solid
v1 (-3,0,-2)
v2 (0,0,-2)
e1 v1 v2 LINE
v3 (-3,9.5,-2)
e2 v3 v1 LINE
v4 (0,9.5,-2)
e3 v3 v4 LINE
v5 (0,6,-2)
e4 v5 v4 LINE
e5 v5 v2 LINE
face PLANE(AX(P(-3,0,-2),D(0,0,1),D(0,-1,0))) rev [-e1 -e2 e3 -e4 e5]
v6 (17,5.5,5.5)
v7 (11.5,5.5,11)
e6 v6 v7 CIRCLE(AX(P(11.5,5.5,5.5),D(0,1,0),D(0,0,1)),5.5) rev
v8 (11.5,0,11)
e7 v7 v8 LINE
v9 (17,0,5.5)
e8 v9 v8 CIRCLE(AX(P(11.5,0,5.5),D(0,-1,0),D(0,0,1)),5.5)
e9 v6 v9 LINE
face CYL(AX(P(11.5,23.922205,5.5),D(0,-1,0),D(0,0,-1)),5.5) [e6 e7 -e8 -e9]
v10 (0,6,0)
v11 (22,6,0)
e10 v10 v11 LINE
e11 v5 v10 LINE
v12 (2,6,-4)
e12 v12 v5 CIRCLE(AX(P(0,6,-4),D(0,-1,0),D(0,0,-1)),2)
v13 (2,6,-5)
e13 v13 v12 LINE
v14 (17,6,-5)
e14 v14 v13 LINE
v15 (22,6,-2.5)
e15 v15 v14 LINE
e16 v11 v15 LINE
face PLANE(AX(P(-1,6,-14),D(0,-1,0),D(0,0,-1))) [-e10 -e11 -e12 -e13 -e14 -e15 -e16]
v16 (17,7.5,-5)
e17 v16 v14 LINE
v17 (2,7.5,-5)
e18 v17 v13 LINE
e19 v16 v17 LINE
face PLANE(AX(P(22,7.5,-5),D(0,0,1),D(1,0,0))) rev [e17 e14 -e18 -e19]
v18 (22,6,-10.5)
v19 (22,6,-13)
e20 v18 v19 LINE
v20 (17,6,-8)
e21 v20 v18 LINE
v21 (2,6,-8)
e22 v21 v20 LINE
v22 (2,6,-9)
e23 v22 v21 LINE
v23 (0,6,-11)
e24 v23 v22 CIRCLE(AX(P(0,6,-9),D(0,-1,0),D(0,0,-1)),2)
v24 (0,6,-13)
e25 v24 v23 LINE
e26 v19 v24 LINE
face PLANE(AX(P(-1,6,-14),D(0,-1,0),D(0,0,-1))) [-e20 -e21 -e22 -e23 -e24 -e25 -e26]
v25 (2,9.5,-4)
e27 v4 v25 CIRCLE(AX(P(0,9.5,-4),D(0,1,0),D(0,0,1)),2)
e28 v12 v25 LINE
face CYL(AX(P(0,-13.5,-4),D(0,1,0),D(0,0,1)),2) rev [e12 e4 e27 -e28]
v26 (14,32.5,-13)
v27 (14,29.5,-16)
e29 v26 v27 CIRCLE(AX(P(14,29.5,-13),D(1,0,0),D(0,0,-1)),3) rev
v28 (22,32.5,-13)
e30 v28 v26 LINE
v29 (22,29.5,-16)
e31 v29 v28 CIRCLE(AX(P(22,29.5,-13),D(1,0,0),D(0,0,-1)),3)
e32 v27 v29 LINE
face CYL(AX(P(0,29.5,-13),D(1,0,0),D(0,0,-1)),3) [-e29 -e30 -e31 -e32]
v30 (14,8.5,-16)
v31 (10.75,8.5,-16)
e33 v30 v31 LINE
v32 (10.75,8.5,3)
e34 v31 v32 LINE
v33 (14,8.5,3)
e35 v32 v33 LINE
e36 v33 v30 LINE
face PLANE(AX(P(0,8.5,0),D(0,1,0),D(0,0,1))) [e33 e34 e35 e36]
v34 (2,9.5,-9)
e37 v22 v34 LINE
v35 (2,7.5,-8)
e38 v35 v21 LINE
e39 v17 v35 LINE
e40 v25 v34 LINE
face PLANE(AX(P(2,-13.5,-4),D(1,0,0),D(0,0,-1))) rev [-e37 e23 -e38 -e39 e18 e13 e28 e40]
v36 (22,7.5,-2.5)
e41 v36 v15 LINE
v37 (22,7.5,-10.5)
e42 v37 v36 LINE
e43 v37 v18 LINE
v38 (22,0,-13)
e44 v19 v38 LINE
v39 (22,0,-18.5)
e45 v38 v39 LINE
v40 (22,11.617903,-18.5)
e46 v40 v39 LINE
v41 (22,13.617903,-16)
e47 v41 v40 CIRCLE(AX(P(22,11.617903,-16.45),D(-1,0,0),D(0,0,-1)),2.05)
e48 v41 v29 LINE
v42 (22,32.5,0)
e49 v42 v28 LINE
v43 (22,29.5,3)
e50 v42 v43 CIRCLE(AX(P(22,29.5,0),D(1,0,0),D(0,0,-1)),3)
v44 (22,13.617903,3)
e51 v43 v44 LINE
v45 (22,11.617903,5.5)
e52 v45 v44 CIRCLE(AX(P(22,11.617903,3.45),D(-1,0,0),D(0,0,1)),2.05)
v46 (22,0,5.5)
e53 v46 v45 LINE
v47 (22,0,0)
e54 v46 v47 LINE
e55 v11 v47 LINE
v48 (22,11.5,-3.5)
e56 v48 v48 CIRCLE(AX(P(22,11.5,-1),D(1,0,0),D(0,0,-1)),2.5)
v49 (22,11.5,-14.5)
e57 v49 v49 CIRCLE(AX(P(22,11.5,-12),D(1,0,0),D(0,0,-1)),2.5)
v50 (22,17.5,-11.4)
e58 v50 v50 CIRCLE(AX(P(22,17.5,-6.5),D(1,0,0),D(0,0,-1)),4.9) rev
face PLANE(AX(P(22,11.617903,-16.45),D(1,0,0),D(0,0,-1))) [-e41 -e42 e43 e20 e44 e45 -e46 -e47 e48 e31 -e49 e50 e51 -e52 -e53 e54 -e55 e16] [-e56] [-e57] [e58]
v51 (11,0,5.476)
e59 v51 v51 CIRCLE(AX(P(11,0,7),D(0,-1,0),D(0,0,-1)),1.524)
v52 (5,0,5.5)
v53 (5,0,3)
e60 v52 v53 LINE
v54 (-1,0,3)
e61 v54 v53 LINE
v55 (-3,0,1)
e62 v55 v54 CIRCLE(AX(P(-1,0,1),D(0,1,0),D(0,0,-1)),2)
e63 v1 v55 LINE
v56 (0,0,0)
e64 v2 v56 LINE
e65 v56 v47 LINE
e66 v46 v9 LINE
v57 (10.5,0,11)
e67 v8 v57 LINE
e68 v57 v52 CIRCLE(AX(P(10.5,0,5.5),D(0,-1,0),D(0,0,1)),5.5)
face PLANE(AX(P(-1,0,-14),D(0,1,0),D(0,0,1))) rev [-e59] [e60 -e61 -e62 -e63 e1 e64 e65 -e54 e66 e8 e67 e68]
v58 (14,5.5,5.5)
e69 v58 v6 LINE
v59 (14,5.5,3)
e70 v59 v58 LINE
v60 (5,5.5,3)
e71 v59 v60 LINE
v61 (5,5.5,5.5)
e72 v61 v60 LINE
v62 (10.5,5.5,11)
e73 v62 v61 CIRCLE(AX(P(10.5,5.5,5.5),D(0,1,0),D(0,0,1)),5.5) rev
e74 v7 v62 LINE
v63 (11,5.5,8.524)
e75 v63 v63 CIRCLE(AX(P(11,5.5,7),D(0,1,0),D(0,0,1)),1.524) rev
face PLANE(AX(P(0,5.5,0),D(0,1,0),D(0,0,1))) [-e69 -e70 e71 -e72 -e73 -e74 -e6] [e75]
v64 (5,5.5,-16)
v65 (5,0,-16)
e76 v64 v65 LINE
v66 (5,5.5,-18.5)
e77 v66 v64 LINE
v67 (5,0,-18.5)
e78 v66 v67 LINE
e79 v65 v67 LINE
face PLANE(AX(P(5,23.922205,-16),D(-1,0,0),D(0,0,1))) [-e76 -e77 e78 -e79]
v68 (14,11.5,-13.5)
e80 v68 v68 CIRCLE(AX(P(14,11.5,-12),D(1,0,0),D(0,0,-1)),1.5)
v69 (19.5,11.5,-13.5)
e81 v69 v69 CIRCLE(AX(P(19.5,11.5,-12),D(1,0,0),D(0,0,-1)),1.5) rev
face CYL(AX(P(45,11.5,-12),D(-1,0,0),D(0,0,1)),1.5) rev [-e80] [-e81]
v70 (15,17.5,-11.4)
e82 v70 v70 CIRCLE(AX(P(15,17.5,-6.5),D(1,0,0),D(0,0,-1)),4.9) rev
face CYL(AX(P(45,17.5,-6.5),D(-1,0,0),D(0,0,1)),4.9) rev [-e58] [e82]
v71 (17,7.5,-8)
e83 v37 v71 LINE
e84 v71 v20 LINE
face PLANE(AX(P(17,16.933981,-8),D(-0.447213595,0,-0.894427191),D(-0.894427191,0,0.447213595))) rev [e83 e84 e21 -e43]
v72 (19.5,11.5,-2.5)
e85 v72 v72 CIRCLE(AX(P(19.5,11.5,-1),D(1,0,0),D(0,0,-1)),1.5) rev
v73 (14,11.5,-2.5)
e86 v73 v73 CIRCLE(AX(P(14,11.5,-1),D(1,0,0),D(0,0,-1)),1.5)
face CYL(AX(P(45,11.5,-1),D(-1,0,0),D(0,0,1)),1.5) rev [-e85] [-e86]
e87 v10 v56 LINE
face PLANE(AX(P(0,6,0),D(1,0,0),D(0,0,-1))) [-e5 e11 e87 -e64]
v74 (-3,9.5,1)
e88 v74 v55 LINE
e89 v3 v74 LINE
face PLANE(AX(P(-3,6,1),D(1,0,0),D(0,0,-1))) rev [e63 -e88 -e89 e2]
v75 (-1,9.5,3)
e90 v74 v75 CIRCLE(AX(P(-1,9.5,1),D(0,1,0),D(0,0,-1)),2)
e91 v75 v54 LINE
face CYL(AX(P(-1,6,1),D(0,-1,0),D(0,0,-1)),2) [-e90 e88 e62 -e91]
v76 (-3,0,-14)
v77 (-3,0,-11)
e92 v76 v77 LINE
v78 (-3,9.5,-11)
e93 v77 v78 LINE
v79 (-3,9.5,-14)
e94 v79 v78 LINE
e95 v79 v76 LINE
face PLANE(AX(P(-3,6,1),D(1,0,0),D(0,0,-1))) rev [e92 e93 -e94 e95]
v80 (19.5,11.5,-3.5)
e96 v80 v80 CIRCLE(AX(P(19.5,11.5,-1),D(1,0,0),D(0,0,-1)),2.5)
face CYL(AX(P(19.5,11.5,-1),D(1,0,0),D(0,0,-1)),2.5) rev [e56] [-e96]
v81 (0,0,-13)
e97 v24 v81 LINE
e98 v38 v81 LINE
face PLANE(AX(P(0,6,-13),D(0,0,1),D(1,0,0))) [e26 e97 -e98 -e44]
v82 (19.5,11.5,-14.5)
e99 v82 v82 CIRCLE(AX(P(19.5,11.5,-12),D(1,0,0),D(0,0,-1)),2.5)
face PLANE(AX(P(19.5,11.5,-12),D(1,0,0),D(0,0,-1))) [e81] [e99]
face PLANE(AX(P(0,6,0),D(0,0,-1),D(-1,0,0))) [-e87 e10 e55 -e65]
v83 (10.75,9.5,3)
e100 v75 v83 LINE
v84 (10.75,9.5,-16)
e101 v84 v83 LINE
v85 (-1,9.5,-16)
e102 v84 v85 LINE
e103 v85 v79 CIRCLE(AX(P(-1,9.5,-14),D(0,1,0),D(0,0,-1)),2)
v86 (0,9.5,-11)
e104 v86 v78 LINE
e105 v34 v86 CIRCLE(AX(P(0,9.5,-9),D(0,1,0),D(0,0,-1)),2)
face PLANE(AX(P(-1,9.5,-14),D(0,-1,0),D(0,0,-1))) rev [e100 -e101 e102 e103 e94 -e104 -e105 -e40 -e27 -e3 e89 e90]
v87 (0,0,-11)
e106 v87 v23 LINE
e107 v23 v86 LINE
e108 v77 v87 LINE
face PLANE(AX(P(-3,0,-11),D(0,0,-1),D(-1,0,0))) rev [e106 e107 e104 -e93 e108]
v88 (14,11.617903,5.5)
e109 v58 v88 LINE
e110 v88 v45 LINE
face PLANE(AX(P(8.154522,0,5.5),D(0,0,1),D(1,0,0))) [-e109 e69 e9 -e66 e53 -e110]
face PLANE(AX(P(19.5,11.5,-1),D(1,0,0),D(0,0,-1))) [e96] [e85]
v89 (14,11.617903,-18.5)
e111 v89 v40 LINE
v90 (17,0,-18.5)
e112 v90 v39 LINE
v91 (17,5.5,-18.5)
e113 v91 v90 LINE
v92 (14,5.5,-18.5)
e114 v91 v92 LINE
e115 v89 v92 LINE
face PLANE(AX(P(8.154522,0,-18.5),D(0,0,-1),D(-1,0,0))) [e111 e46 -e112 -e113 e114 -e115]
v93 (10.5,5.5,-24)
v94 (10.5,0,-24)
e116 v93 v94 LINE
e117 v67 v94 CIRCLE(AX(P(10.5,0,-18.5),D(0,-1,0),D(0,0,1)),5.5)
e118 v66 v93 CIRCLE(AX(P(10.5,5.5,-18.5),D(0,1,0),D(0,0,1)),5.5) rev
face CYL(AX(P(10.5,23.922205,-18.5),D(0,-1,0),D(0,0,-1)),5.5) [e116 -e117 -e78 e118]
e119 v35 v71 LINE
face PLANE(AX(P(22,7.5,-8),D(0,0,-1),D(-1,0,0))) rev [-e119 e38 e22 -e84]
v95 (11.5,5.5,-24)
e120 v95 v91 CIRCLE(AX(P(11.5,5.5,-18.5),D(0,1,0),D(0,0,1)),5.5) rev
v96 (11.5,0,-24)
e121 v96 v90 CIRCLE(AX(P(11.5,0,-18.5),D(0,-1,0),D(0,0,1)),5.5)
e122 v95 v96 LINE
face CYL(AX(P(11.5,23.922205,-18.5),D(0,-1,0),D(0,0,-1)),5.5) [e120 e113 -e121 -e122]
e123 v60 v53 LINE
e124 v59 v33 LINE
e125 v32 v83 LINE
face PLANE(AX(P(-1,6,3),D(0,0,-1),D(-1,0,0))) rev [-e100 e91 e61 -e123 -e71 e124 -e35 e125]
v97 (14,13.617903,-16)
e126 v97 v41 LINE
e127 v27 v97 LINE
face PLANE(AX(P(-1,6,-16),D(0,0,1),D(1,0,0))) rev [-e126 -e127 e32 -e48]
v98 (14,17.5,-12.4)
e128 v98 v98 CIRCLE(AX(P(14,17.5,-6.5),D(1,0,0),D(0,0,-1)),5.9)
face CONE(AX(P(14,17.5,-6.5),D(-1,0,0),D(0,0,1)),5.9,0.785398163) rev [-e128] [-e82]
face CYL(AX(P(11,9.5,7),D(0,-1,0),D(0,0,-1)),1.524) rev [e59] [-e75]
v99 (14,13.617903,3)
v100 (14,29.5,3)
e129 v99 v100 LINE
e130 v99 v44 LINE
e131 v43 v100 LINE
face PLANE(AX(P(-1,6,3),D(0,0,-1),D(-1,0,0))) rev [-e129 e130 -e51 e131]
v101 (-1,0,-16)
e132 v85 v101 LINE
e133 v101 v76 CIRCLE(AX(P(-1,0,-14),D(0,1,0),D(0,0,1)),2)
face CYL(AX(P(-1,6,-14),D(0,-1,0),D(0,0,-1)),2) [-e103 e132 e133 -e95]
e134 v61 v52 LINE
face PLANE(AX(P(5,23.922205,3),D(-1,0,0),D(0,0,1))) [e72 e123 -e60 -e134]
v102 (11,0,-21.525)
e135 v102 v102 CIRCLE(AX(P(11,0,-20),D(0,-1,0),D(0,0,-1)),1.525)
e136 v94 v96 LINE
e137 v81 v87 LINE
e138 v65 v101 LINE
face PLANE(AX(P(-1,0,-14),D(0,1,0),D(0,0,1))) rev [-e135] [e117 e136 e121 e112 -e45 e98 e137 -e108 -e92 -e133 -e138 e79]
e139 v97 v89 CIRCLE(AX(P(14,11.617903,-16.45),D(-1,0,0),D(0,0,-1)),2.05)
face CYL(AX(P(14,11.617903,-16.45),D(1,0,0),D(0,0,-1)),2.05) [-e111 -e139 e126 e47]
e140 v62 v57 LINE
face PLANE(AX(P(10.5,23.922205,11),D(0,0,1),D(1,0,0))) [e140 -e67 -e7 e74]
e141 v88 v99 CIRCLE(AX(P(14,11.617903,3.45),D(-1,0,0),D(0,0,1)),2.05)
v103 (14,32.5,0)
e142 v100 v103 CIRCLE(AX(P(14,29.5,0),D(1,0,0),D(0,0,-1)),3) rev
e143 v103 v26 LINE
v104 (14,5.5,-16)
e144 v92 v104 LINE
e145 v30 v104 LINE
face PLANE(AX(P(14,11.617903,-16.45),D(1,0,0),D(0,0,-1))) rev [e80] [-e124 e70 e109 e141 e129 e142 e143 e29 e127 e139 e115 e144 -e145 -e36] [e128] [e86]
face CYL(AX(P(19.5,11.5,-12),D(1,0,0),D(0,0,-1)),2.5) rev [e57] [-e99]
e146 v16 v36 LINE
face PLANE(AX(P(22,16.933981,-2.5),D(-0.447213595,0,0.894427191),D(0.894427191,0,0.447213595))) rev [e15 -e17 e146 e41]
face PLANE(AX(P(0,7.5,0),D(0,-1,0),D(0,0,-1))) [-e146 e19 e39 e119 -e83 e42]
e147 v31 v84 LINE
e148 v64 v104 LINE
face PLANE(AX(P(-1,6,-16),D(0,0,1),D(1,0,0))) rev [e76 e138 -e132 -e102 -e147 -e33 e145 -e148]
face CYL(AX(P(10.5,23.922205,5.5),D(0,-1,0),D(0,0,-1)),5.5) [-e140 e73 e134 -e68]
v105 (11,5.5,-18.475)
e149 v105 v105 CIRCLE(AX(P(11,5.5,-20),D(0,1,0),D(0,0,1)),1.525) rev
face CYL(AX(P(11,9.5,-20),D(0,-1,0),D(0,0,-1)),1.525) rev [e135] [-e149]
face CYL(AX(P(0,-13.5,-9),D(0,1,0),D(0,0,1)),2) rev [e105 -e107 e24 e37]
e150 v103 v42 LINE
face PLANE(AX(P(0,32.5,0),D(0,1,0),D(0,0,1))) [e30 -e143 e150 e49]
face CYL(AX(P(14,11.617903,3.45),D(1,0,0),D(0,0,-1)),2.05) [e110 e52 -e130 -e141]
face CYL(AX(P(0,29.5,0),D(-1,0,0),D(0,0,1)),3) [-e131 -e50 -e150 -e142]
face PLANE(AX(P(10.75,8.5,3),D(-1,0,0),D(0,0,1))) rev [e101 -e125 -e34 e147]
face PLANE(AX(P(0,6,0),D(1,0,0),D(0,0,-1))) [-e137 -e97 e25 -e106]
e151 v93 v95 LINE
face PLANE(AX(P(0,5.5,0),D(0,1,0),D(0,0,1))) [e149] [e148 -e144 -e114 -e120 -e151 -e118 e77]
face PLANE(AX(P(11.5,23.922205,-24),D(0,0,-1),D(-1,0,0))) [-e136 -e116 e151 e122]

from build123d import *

# Parameters (mm, degrees)
SKETCH1_W           = 22
SKETCH1_H           = 13
BOSS_EXTRUDE1_DEPTH = 6
BOSS_EXTRUDE2_DEPTH = 3.5
BOSS_EXTRUDE3_DEPTH = 9.5
SKETCH4_R           = 1.525
SKETCH4_R_2         = 1.524
CUT_EXTRUDE1_DEPTH  = 36.933967218
SKETCH5_W           = 9
SKETCH5_H           = 5.5
CUT_EXTRUDE2_DEPTH  = 39.082148049
FILLET1_R           = 2
SKETCH6_W           = 12
SKETCH6_H           = 13.009000019
SKETCH6_W_2         = 15.838286437
CUT_EXTRUDE3_DEPTH  = 4
BOSS_EXTRUDE4_DEPTH = 23
CUT_EXTRUDE4_DEPTH  = 23
SKETCH9_R           = 4.9
CUT_EXTRUDE6_DEPTH  = 23
SKETCH10_R          = 1.5
CUT_EXTRUDE7_DEPTH  = 23
BOSS_EXTRUDE5_DEPTH = 3
FILLET2_R           = 2.5
FILLET3_R           = 2.5
SKETCH12_W          = 20
SKETCH12_H          = 3
CUT_EXTRUDE8_DEPTH  = 1.5
BOSS_EXTRUDE6_DEPTH = 8
SKETCH15_R          = 4.9
SKETCH15_R_2        = 1.5
CUT_EXTRUDE9_DEPTH  = 48.51052515
SKETCH16_W          = 29.561254557
SKETCH16_H          = 40.782628596
CUT_EXTRUDE10_DEPTH = 3
SKETCH17_W          = 8
SKETCH17_H          = 5.5
BOSS_EXTRUDE7_DEPTH = 9.5
CUT_EXTRUDE11_DEPTH = 1.5
SKETCH20_R          = 2.5
CUT_EXTRUDE12_DEPTH = 2.5
SKETCH19_W          = 3.25
SKETCH19_H          = 19
CUT_EXTRUDE13_DEPTH = 1
CHAMFER1_SIZE       = 1
FILLET4_R           = 3


with BuildPart() as part:
    # Sketch1 → Boss-Extrude1 (new body)
    with BuildSketch(Plane(origin=(0, 0, 0), x_dir=(1, 0, 0), z_dir=(0, 1, 0))):
        with BuildLine():
            Line((-1, -3), (23, -3))
            Line((23, -3), (25, -3))
            Line((25, -3), (25, -1))
            Line((25, -1), (25, 14))
            Line((25, 14), (25, 16))
            Line((25, 16), (23, 16))
            Line((23, 16), (-1, 16))
            ThreePointArc((-1, 16), (-2.414213562, 15.414213562), (-3, 14))
            Line((-3, 14), (-3, -1))
            ThreePointArc((-3, -1), (-2.414213562, -2.414213562), (-1, -3))
        make_face()
        with Locations((11, 6.5)):
            Rectangle(SKETCH1_W, SKETCH1_H, mode=Mode.SUBTRACT)
    extrude(amount=BOSS_EXTRUDE1_DEPTH)

    # Sketch2 → Boss-Extrude2 (add)
    with BuildSketch(Plane(origin=(0, 6, 0), x_dir=(1, 0, 0), z_dir=(0, 1, 0))):
        with BuildLine():
            Line((25, 14), (25, -1))
            Line((25, -1), (25, -3))
            Line((25, -3), (23, -3))
            Line((23, -3), (-1, -3))
            ThreePointArc((-1, -3), (-2.414213562, -2.414213562), (-3, -1))
            Line((-3, -1), (-3, 14))
            ThreePointArc((-3, 14), (-2.414213562, 15.414213562), (-1, 16))
            Line((-1, 16), (23, 16))
            Line((23, 16), (25, 16))
            Line((25, 16), (25, 14))
        make_face()
    extrude(amount=BOSS_EXTRUDE2_DEPTH)

    # Sketch3 → Boss-Extrude3 (add)
    with BuildSketch(Plane.XZ):
        with BuildLine():
            Line((5, 3), (17, 3))
            Line((17, 3), (17, 5.5))
            ThreePointArc((17, 5.5), (15.389087297, 9.389087297), (11.5, 11))
            Line((11.5, 11), (10.5, 11))
            ThreePointArc((10.5, 11), (6.610912703, 9.389087297), (5, 5.5))
            Line((5, 5.5), (5, 3))
        make_face()
        with BuildLine():
            Line((17, -16), (5, -16))
            Line((5, -16), (5, -18.5))
            ThreePointArc((5, -18.5), (6.610912703, -22.389087297), (10.5, -24))
            Line((10.5, -24), (11.5, -24))
            ThreePointArc((11.5, -24), (15.389087297, -22.389087297), (17, -18.5))
            Line((17, -18.5), (17, -16))
        make_face()
    extrude(amount=-BOSS_EXTRUDE3_DEPTH)

    # Sketch4 → Cut-Extrude1 (cut, through all)
    with BuildSketch(Plane(origin=(0, 0, 0), x_dir=(-1, 0, 0), z_dir=(0, -1, 0))):
        with Locations(Location((-11, 20, 0), (0, 0, 90))):
            Circle(SKETCH4_R)
        with Locations(Location((-11, -7, 0), (0, 0, 90))):
            Circle(SKETCH4_R_2)
    extrude(amount=-CUT_EXTRUDE1_DEPTH, mode=Mode.SUBTRACT)

    # Sketch5 → Cut-Extrude2 (cut, through all)
    with BuildSketch(Plane(origin=(25, 0, 0), x_dir=(0, 0, -1), z_dir=(1, 0, 0))):
        with Locations((6.5, 2.75)):
            Rectangle(SKETCH5_W, SKETCH5_H)
    extrude(amount=-CUT_EXTRUDE2_DEPTH, mode=Mode.SUBTRACT)

    # Fillet1
    fillet1_edges = [part.edges().sort_by_distance(p)[0] for p in [
        (-1.5, 5.5, -11),
        (-1.5, 5.5, -2),
        (23.5, 5.5, -11),
        (23.5, 5.5, -2),
    ]]
    fillet(fillet1_edges, radius=FILLET1_R)

    # Sketch6 → Cut-Extrude3 (cut)
    with BuildSketch(Plane(origin=(0, 9.5, 0), x_dir=(1, 0, 0), z_dir=(0, 1, 0))):
        with Locations((11, 22.504500009)):
            Rectangle(SKETCH6_W, SKETCH6_H)
        with Locations((11.149066226, -9.50450001)):
            Rectangle(SKETCH6_W_2, SKETCH6_H)
    extrude(amount=-CUT_EXTRUDE3_DEPTH, mode=Mode.SUBTRACT)

    # Sketch7 → Boss-Extrude4 (add)
    with BuildSketch(Plane(origin=(0, 9.5, 0), x_dir=(1, 0, 0), z_dir=(0, 1, 0))):
        Polygon((23, 16), (22, 16), (22, -3), (23, -3), (25, -3), (25, -1), (25, 14), (25, 16), align=None)
    extrude(amount=BOSS_EXTRUDE4_DEPTH)

    # Sketch8 → Cut-Extrude4 (cut)
    with BuildSketch(Plane(origin=(0, 9.5, 0), x_dir=(1, 0, 0), z_dir=(0, 1, 0))):
        with BuildLine():
            Line((-3, 2), (0, 2))
            ThreePointArc((0, 2), (1.414213562, 2.585786438), (2, 4))
            Line((2, 4), (2, 9))
            ThreePointArc((2, 9), (1.414213562, 10.414213562), (0, 11))
            Line((0, 11), (-3, 11))
            Line((-3, 11), (-3, 2))
        make_face()
    extrude(amount=-CUT_EXTRUDE4_DEPTH, mode=Mode.SUBTRACT)

    # Sketch9 → Cut-Extrude6 (cut)
    with BuildSketch(Plane.ZY.offset(-22)):
        with Locations((-6.5, 17.5)):
            Circle(SKETCH9_R)
    extrude(amount=-CUT_EXTRUDE6_DEPTH, mode=Mode.SUBTRACT)

    # Sketch10 → Cut-Extrude7 (cut)
    with BuildSketch(Plane.ZY.offset(-22)):
        with Locations((-12, 11.5)):
            Circle(SKETCH10_R)
        with Locations((-1, 11.5)):
            Circle(SKETCH10_R)
    extrude(amount=-CUT_EXTRUDE7_DEPTH, mode=Mode.SUBTRACT)

    # Sketch11 → Boss-Extrude5 (add)
    with BuildSketch(Plane(origin=(25, 0, 0), x_dir=(0, 0, -1), z_dir=(1, 0, 0))):
        with BuildLine():
            Line((-3, 0), (-5.5, 0))
            Line((-5.5, 0), (-5.5, 11.617902622))
            ThreePointArc((-5.5, 11.617902622), (-4.914213562, 13.032116185), (-3.5, 13.617902622))
            Line((-3.5, 13.617902622), (-3, 13.617902622))
            Line((-3, 13.617902622), (-3, 0))
        make_face()
        with BuildLine():
            Line((16, 0), (18.5, 0))
            Line((18.5, 0), (18.5, 11.617902622))
            ThreePointArc((18.5, 11.617902622), (17.914213562, 13.032116185), (16.5, 13.617902622))
            Line((16.5, 13.617902622), (16, 13.617902622))
            Line((16, 13.617902622), (16, 0))
        make_face()
    extrude(amount=-BOSS_EXTRUDE5_DEPTH)

    # Fillet2
    fillet2_edges = [part.edges().sort_by_distance(p)[0] for p in [
        (22, 4.75, 3),
    ]]
    fillet(fillet2_edges, radius=FILLET2_R - 0.0001)  # a hair under: the kernel refuses the full size

    # Fillet3
    fillet3_edges = [part.edges().sort_by_distance(p)[0] for p in [
        (22, 4.75, -16),
    ]]
    fillet(fillet3_edges, radius=FILLET3_R - 0.0001)  # a hair under: the kernel refuses the full size

    # Sketch12 → Cut-Extrude8 (cut)
    with BuildSketch(Plane.XZ.offset(-6)):
        with Locations((12, -6.5)):
            Rectangle(SKETCH12_W, SKETCH12_H)
    extrude(amount=-CUT_EXTRUDE8_DEPTH, mode=Mode.SUBTRACT)

    # Sketch14 → Boss-Extrude6 (add)
    with BuildSketch(Plane.ZY.offset(-22)):
        with BuildLine():
            Line((-16, 32.5), (3, 32.5))
            Line((3, 32.5), (3, 13.617902622))
            ThreePointArc((3, 13.617902622), (4.730624847, 13.218683682), (5.5, 11.617902622))
            Line((5.5, 11.617902622), (5.5, 9.5))
            Line((5.5, 9.5), (3, 9.5))
            Line((3, 9.5), (-16, 9.5))
            Line((-16, 9.5), (-18.5, 9.5))
            Line((-18.5, 9.5), (-18.5, 11.617902622))
            ThreePointArc((-18.5, 11.617902622), (-17.730624847, 13.218683682), (-16, 13.617902622))
            Line((-16, 13.617902622), (-16, 32.5))
        make_face()
    extrude(amount=BOSS_EXTRUDE6_DEPTH)

    # Sketch15 → Cut-Extrude9 (cut, through all)
    with BuildSketch(Plane(origin=(22, 0, 0), x_dir=(0, 0, -1), z_dir=(1, 0, 0))):
        with Locations(Location((6.5, 17.5, 0), (0, 0, 180))):
            Circle(SKETCH15_R)
        with Locations(Location((1, 11.5, 0), (0, 0, 180))):
            Circle(SKETCH15_R_2)
        with Locations(Location((12, 11.5, 0), (0, 0, 180))):
            Circle(SKETCH15_R_2)
    extrude(amount=-CUT_EXTRUDE9_DEPTH, mode=Mode.SUBTRACT)

    # Sketch16 → Cut-Extrude10 (cut)
    with BuildSketch(Plane(origin=(25, 0, 0), x_dir=(0, 0, -1), z_dir=(1, 0, 0))):
        with Locations((4.352462689, 15.924842514)):
            Rectangle(SKETCH16_W, SKETCH16_H)
    extrude(amount=-CUT_EXTRUDE10_DEPTH, mode=Mode.SUBTRACT)

    # Sketch17 → Boss-Extrude7 (add)
    with BuildSketch(Plane.XZ):
        with Locations((18, -15.75)):
            Rectangle(SKETCH17_W, SKETCH17_H)
        with Locations((18, 2.75)):
            Rectangle(SKETCH17_W, SKETCH17_H)
    extrude(amount=-BOSS_EXTRUDE7_DEPTH)

    # Sketch18 → Cut-Extrude11 (cut)
    with BuildSketch(Plane(origin=(0, 6, 0), x_dir=(-1, 0, 0), z_dir=(0, -1, 0))):
        Polygon((-22, 2.5), (-17, 5), (-17, 8), (-22, 10.5), align=None)
    extrude(amount=-CUT_EXTRUDE11_DEPTH, mode=Mode.SUBTRACT)

    # Sketch20 → Cut-Extrude12 (cut)
    with BuildSketch(Plane(origin=(22, 0, 0), x_dir=(0, 0, -1), z_dir=(1, 0, 0))):
        with Locations((1, 11.5)):
            Circle(SKETCH20_R)
        with Locations((12, 11.5)):
            Circle(SKETCH20_R)
    extrude(amount=-CUT_EXTRUDE12_DEPTH, mode=Mode.SUBTRACT)

    # Sketch19 → Cut-Extrude13 (cut)
    with BuildSketch(Plane(origin=(0, 9.5, 0), x_dir=(1, 0, 0), z_dir=(0, 1, 0))):
        with Locations((12.375, 6.5)):
            Rectangle(SKETCH19_W, SKETCH19_H)
    extrude(amount=-CUT_EXTRUDE13_DEPTH, mode=Mode.SUBTRACT)

    # Chamfer1
    chamfer1_edges = [part.edges().sort_by_distance(p)[0] for p in [
        (14, 17.5, -11.4),
    ]]
    chamfer(chamfer1_edges, length=CHAMFER1_SIZE)

    # Fillet4
    fillet4_edges = [part.edges().sort_by_distance(p)[0] for p in [
        (18, 32.5, 3),
        (18, 32.5, -16),
    ]]
    fillet(fillet4_edges, radius=FILLET4_R)


solid = part.part
